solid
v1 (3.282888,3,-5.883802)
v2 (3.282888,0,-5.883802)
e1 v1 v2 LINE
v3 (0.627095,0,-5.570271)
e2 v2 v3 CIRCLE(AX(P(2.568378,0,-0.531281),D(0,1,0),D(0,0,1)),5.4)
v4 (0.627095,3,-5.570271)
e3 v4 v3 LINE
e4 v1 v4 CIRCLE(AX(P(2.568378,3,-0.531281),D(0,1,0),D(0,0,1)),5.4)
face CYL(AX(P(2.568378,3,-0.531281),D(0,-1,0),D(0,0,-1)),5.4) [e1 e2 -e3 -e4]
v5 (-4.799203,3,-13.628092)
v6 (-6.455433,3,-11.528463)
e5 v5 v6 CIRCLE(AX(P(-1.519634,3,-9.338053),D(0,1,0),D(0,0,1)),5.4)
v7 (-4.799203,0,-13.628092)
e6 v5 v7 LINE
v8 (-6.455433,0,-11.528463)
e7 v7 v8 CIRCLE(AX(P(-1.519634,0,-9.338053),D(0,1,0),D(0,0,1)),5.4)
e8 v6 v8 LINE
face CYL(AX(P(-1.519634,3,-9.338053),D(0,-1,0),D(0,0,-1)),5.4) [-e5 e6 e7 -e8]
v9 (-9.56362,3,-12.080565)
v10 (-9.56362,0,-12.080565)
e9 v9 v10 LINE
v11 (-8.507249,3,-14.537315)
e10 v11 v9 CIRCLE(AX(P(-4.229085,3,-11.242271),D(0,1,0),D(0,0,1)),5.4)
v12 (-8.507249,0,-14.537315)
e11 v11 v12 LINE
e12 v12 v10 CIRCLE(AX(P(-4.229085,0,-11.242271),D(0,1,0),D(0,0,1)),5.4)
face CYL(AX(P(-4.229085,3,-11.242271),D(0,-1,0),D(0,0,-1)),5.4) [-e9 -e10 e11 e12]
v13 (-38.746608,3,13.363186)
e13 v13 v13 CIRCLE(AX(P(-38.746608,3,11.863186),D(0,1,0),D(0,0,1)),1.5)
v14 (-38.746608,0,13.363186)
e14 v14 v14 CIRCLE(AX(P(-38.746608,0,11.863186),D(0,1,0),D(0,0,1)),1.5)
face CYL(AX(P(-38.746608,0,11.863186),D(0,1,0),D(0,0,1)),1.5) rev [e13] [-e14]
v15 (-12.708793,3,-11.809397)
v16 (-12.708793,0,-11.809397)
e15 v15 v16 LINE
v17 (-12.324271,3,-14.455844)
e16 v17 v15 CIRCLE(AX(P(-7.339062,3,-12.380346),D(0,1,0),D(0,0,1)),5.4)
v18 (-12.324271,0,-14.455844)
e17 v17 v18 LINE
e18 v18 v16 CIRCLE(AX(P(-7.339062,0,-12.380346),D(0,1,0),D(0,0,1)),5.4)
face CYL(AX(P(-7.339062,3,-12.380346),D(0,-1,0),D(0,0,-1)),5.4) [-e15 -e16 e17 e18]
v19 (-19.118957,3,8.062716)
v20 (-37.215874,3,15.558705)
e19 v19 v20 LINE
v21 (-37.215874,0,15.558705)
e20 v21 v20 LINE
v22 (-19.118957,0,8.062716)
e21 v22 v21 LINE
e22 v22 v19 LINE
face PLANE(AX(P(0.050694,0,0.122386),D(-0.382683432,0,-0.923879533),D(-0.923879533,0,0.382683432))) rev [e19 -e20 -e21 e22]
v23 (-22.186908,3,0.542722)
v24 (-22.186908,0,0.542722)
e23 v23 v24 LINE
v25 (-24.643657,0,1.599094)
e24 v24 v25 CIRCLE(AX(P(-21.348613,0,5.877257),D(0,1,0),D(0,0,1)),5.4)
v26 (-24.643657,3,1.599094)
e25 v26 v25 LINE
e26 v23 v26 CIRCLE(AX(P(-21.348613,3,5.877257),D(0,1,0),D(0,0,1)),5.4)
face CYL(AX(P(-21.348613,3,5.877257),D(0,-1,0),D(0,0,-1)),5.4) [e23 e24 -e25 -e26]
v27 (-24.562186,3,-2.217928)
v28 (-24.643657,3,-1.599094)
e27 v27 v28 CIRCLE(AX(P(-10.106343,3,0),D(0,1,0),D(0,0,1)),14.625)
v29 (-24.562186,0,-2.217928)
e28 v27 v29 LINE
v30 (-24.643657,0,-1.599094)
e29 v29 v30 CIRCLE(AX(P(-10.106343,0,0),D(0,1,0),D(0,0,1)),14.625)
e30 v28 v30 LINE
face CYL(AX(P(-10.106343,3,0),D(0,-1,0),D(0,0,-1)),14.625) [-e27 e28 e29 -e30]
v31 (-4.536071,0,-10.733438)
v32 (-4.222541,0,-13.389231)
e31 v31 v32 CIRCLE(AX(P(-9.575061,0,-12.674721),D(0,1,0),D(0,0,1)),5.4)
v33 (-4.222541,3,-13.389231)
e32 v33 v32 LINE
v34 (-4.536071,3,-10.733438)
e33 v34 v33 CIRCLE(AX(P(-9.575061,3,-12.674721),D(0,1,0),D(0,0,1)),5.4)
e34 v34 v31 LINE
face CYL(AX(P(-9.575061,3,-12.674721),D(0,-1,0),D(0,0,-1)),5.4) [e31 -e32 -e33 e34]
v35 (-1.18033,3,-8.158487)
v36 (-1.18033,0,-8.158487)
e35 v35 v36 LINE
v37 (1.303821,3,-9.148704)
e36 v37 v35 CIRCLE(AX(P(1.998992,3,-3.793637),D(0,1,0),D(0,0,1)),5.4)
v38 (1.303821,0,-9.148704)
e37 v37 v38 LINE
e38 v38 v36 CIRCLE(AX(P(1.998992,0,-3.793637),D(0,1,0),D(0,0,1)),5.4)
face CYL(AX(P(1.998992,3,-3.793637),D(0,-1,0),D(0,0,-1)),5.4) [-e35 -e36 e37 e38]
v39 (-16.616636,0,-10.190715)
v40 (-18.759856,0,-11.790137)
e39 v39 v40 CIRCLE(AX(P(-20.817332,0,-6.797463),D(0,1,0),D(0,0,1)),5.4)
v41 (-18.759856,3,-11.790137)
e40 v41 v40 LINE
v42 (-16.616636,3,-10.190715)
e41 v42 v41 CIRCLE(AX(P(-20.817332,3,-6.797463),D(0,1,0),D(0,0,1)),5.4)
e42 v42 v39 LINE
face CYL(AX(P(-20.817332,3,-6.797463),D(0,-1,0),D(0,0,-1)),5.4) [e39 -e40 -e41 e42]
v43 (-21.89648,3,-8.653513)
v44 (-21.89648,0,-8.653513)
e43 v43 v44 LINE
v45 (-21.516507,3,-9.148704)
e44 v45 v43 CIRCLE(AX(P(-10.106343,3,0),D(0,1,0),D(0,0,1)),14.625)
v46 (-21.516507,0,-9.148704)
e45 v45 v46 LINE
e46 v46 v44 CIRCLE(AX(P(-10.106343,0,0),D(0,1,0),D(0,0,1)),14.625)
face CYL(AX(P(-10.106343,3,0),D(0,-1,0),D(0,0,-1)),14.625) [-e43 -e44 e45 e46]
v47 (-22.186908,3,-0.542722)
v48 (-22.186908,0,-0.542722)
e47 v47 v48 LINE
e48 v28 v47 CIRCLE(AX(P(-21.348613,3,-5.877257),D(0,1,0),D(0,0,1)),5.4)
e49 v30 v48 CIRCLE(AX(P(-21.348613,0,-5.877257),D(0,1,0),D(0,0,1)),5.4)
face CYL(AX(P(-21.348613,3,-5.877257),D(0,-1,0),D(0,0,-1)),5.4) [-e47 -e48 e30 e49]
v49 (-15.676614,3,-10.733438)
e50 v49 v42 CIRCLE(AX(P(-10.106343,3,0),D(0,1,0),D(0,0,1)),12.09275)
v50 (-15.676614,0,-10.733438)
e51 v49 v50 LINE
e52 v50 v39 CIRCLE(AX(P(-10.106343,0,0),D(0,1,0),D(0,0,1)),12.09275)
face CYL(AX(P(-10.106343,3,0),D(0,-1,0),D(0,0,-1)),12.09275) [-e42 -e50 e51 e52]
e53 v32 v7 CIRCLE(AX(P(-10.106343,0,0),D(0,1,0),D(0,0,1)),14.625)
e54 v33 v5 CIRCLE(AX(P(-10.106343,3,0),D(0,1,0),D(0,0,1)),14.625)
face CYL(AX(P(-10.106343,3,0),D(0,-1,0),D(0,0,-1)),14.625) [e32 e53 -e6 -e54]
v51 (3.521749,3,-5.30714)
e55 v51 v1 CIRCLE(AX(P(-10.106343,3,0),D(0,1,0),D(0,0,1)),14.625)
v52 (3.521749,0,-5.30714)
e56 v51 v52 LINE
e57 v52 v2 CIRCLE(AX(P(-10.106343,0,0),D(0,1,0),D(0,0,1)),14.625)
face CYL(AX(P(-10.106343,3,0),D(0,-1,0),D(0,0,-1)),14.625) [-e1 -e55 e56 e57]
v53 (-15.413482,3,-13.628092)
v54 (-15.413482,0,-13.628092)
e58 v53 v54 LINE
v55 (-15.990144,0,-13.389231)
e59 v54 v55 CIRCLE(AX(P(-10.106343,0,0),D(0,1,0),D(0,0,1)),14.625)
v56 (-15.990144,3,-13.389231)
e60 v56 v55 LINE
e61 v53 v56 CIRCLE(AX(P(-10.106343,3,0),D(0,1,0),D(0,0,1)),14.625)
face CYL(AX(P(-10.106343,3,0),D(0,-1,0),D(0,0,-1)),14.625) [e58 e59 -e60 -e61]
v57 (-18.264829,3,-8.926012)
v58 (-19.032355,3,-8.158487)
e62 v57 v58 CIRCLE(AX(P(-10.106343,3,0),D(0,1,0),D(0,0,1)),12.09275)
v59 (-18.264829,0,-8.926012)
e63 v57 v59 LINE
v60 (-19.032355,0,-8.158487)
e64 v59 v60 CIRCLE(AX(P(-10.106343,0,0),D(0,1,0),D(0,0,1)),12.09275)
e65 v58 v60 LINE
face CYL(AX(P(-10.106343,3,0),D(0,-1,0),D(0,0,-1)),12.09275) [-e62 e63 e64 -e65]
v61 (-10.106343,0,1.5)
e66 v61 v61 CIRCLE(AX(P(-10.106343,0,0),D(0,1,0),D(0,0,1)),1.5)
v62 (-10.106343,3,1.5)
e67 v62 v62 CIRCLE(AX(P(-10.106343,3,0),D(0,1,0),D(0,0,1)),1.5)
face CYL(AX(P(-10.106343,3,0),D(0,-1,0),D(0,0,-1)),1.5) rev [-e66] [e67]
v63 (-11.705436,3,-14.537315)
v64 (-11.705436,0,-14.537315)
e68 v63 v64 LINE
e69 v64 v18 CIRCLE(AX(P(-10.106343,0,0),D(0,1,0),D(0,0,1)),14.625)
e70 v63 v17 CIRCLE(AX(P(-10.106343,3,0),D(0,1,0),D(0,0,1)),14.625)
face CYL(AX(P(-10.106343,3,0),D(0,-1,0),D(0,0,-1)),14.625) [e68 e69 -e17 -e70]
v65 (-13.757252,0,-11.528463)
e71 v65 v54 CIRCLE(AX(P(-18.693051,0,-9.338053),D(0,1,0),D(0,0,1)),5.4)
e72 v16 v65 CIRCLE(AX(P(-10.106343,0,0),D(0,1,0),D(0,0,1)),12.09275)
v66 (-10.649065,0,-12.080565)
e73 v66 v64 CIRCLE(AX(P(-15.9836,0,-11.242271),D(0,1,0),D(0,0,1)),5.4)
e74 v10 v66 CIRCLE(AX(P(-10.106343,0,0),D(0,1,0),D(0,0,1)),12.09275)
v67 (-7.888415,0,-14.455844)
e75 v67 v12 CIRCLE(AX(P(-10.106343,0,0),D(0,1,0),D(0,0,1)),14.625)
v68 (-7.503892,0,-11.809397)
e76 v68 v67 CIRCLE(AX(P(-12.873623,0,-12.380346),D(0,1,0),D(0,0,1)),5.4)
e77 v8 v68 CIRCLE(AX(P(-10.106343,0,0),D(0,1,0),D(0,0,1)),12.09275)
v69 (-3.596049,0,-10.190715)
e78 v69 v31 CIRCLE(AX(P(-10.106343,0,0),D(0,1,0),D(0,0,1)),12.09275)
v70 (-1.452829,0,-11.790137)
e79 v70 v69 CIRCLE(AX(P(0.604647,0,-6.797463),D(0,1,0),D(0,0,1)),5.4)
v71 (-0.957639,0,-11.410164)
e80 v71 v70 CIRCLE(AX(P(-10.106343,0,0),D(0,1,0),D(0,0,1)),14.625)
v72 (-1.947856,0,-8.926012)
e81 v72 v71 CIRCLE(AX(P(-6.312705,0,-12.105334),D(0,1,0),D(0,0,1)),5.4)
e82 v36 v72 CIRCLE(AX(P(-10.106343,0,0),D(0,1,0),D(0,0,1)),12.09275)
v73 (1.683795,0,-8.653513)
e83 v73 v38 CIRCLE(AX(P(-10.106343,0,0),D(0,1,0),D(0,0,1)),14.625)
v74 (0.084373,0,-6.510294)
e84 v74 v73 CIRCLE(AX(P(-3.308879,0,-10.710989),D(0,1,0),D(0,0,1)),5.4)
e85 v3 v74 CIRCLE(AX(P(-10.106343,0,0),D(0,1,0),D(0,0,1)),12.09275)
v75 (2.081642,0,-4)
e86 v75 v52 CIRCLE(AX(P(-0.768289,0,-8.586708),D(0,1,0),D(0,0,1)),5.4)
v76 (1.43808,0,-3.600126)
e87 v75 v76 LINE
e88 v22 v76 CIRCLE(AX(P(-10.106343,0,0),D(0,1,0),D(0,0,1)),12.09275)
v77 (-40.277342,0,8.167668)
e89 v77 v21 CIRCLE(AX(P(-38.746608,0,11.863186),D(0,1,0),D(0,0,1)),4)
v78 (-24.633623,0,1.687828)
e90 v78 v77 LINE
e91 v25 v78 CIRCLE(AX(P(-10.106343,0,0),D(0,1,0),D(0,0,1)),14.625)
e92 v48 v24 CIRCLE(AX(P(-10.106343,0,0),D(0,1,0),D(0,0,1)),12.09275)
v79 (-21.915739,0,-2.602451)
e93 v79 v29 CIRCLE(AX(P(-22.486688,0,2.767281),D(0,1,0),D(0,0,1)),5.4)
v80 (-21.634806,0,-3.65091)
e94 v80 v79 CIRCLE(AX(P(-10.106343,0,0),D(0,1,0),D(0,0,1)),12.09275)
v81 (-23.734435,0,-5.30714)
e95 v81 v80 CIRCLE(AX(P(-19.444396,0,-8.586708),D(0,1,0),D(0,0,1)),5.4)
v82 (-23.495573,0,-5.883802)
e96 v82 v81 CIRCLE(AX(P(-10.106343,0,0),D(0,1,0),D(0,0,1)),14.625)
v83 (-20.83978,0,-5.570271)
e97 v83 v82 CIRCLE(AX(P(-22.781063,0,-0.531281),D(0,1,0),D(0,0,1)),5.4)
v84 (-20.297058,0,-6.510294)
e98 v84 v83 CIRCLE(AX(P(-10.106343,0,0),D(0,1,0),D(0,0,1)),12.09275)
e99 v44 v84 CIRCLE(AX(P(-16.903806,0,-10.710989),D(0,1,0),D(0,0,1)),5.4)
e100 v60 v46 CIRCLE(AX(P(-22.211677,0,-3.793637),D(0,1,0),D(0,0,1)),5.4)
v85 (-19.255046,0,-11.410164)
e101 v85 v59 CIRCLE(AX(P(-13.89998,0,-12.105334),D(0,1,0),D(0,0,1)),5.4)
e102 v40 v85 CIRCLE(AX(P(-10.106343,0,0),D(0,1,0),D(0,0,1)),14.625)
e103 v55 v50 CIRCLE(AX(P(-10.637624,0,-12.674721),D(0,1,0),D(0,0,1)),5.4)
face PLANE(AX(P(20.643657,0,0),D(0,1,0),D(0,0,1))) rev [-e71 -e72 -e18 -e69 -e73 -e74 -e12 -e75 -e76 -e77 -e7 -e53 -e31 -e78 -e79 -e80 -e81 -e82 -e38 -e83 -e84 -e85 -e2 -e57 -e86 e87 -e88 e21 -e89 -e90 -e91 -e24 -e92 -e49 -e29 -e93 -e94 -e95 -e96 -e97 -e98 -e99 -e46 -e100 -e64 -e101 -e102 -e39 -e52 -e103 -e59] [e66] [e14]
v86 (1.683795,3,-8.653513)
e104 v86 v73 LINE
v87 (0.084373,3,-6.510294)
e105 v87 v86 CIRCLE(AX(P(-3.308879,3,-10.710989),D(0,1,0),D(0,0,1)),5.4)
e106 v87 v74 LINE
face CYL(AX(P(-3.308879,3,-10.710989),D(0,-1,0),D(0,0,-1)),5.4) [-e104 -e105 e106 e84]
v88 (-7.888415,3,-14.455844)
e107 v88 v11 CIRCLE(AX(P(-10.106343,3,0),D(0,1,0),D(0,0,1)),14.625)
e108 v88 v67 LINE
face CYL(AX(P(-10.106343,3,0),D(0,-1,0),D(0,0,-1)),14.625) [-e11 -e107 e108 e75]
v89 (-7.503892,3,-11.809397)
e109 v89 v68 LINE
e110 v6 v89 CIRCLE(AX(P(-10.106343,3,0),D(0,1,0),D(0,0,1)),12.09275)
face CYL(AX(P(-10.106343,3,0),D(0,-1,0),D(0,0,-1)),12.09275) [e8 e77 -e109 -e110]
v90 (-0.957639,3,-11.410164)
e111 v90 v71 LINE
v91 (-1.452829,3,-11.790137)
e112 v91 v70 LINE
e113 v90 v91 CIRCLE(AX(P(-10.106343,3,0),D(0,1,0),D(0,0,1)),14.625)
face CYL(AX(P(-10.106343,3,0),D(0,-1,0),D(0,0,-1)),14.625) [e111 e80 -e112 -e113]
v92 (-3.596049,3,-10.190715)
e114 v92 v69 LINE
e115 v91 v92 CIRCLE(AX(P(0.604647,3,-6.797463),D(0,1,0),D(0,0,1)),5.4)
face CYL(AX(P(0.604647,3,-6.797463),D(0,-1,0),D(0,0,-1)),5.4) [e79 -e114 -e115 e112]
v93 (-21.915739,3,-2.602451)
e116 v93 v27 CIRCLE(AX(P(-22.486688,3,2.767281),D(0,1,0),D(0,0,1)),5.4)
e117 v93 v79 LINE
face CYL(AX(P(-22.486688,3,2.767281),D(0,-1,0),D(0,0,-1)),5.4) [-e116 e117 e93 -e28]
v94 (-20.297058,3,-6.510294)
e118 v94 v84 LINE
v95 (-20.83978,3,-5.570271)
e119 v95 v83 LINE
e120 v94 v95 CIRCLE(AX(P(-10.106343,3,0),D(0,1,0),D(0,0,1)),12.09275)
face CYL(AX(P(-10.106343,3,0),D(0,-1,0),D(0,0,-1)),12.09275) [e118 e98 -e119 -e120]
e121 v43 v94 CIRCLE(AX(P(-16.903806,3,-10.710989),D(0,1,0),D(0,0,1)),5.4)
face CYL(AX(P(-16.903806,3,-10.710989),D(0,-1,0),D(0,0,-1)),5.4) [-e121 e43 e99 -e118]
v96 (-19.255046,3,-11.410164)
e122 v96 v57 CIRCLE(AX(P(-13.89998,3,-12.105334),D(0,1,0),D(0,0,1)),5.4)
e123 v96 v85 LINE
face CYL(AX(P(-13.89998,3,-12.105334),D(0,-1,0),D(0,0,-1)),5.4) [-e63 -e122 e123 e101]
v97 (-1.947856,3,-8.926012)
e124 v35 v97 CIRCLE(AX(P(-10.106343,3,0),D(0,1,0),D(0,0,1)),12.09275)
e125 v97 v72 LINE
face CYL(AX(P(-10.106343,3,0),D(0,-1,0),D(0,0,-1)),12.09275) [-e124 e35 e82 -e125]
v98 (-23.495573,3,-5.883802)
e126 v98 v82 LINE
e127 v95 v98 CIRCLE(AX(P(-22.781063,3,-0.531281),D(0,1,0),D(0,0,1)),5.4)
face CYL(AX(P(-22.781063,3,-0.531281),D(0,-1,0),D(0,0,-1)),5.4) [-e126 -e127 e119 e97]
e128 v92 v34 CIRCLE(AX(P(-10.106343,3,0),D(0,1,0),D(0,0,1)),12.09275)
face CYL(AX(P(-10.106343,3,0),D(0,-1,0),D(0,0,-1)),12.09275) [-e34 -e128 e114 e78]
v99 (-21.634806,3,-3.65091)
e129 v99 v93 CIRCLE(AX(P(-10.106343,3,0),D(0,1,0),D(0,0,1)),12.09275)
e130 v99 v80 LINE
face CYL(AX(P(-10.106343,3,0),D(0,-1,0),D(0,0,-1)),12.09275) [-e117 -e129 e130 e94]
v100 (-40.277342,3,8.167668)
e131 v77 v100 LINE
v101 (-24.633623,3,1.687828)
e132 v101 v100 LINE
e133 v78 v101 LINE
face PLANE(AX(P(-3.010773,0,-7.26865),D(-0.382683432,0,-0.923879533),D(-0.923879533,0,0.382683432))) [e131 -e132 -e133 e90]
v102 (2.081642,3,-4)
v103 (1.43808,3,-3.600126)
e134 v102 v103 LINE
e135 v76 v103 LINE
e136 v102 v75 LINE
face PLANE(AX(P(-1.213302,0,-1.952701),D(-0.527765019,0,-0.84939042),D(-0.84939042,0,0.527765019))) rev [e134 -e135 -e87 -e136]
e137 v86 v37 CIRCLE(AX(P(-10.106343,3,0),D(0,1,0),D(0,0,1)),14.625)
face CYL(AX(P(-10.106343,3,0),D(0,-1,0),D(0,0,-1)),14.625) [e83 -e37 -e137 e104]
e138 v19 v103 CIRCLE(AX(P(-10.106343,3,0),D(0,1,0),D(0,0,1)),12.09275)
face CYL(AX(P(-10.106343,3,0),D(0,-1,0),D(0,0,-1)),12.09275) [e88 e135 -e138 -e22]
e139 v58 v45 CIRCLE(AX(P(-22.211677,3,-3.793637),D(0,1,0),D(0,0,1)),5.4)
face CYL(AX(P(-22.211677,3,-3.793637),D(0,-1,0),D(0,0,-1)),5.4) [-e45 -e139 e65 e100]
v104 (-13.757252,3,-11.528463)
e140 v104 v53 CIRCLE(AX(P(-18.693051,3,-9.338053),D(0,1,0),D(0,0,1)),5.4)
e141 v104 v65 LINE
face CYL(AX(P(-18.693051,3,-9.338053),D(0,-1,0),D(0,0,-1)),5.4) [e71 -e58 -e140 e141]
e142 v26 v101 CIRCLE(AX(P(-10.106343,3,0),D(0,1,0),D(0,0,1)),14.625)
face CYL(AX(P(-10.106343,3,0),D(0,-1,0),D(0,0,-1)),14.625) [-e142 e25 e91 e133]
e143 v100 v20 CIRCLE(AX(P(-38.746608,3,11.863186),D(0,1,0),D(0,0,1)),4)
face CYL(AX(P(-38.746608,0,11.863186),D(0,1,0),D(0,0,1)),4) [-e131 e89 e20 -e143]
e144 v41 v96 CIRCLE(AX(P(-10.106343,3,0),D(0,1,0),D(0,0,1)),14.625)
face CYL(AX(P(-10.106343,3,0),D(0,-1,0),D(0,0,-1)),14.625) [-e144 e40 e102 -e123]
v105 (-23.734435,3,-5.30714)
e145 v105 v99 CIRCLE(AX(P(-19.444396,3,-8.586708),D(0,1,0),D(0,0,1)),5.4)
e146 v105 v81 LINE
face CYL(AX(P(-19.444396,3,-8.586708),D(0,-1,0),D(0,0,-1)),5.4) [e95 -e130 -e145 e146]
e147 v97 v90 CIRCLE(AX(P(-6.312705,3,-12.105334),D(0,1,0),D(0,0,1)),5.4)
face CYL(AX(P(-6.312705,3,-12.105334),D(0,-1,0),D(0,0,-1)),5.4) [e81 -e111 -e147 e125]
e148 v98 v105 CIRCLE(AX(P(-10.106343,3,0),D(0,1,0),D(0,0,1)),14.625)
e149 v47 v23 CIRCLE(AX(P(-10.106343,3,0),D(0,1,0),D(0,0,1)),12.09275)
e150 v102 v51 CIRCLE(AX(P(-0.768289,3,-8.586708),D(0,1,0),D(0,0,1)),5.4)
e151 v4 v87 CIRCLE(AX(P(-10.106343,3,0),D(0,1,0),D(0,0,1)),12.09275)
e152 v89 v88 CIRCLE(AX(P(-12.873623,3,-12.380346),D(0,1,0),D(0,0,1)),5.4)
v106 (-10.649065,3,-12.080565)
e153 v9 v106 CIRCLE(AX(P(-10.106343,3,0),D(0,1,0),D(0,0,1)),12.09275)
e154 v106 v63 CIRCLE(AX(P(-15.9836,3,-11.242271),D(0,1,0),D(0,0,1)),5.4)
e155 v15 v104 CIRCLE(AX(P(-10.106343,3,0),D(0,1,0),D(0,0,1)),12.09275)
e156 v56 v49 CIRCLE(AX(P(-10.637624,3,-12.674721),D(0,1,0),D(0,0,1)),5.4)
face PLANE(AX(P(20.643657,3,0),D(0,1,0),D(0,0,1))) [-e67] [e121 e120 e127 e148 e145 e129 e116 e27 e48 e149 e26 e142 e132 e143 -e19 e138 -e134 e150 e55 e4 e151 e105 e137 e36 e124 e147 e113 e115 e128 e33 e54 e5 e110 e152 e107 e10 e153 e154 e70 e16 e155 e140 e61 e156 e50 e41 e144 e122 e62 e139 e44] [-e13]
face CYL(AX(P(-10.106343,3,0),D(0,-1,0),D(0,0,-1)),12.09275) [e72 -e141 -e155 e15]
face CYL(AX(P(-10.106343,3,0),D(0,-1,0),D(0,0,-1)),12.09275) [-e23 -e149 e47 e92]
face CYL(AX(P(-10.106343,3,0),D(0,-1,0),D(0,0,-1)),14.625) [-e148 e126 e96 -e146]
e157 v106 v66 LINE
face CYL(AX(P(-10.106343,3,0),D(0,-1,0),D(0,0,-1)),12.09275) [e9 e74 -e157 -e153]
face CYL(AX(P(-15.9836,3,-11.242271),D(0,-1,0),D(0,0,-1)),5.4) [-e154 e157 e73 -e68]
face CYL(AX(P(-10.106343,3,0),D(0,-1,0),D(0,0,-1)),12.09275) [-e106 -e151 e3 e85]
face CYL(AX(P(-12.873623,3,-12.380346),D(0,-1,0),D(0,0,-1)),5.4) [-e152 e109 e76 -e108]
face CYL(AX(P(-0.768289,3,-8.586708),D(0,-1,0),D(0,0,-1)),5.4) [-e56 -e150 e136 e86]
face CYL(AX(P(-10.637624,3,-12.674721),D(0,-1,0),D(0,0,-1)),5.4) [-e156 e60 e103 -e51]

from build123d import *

# Parameters (mm, degrees)
SKETCH1_R              = 1.5
BOSS_EXTRUDE1_DEPTH    = 3
SKETCH3_R              = 1.5
BOSS_EXTRUDE2_DEPTH    = 3
CUT_EXTRUDE1_OUTLINE_R = 1.5
CUT_EXTRUDE1_DEPTH     = 3


# Read off the part's stored shape, not the designer's step: Cut-Extrude1
with BuildPart() as part:
    # Sketch1 → Boss-Extrude1 (new body)
    with BuildSketch(Plane(origin=(0, 0, 0), x_dir=(1, 0, 0), z_dir=(0, 1, 0))):
        with BuildLine():
            Line((20.643657446, 4), (2.081641936, 4))
            ThreePointArc((2.081641936, 4), (2.861028333, 4.588201733), (3.521749436, 5.30713988))
            ThreePointArc((3.521749436, 5.30713988), (3.405395609, 5.596745198), (3.282888305, 5.883801663))
            ThreePointArc((3.282888305, 5.883801663), (1.93527598, 5.894040025), (0.627094961, 5.57027124))
            ThreePointArc((0.627094961, 5.57027124), (0.366286148, 6.046375), (0.084372603, 6.510293938))
            ThreePointArc((0.084372603, 6.510293938), (1.018855105, 7.48132754), (1.683794586, 8.65351323))
            ThreePointArc((1.683794586, 8.65351323), (1.496450048, 8.903135899), (1.303821399, 9.148703928))
            ThreePointArc((1.303821399, 9.148703928), (-0.000522033, 8.809805691), (-1.180330337, 8.158486898))
            ThreePointArc((-1.180330337, 8.158486898), (-1.555477026, 8.550865528), (-1.947855656, 8.926012217))
            ThreePointArc((-1.947855656, 8.926012217), (-1.296536862, 10.105820521), (-0.957638625, 11.410163953))
            ThreePointArc((-0.957638625, 11.410163953), (-1.203206655, 11.602792602), (-1.452829324, 11.79013714))
            ThreePointArc((-1.452829324, 11.79013714), (-2.625015014, 11.125197659), (-3.596048616, 10.190715157))
            ThreePointArc((-3.596048616, 10.190715157), (-4.059967554, 10.472628702), (-4.536071314, 10.733437515))
            ThreePointArc((-4.536071314, 10.733437515), (-4.212302529, 12.041618533), (-4.222540891, 13.389230859))
            ThreePointArc((-4.222540891, 13.389230859), (-4.509597355, 13.511738163), (-4.799202674, 13.62809199))
            ThreePointArc((-4.799202674, 13.62809199), (-5.759348103, 12.682425791), (-6.455432668, 11.528463019))
            ThreePointArc((-6.455432668, 11.528463019), (-6.976508546, 11.680699536), (-7.503891752, 11.809396783))
            ThreePointArc((-7.503891752, 11.809396783), (-7.529737283, 13.156800143), (-7.888414517, 14.455843809))
            ThreePointArc((-7.888414517, 14.455843809), (-8.197396993, 14.499881098), (-8.507248835, 14.537314892))
            ThreePointArc((-8.507248835, 14.537314892), (-9.18992168, 13.375367565), (-9.563620196, 12.080565177))
            ThreePointArc((-9.563620196, 12.080565177), (-10.106342554, 12.09275), (-10.649064912, 12.080565177))
            ThreePointArc((-10.649064912, 12.080565177), (-11.022763428, 13.375367565), (-11.705436272, 14.537314892))
            ThreePointArc((-11.705436272, 14.537314892), (-12.015288115, 14.499881098), (-12.324270591, 14.455843809))
            ThreePointArc((-12.324270591, 14.455843809), (-12.682947825, 13.156800143), (-12.708793355, 11.809396783))
            ThreePointArc((-12.708793355, 11.809396783), (-13.236176561, 11.680699536), (-13.757252439, 11.528463019))
            ThreePointArc((-13.757252439, 11.528463019), (-14.453337005, 12.682425791), (-15.413482434, 13.62809199))
            ThreePointArc((-15.413482434, 13.62809199), (-15.703087752, 13.511738163), (-15.990144217, 13.389230859))
            ThreePointArc((-15.990144217, 13.389230859), (-16.000382579, 12.041618533), (-15.676613793, 10.733437515))
            ThreePointArc((-15.676613793, 10.733437515), (-16.152717554, 10.472628702), (-16.616636492, 10.190715157))
            ThreePointArc((-16.616636492, 10.190715157), (-17.587670094, 11.125197659), (-18.759855783, 11.79013714))
            ThreePointArc((-18.759855783, 11.79013714), (-19.009478453, 11.602792602), (-19.255046482, 11.410163953))
            ThreePointArc((-19.255046482, 11.410163953), (-18.916148245, 10.105820521), (-18.264829452, 8.926012217))
            ThreePointArc((-18.264829452, 8.926012217), (-18.657208082, 8.550865528), (-19.032354771, 8.158486898))
            ThreePointArc((-19.032354771, 8.158486898), (-20.212163074, 8.809805691), (-21.516506507, 9.148703928))
            ThreePointArc((-21.516506507, 9.148703928), (-21.709135156, 8.903135899), (-21.896479694, 8.65351323))
            ThreePointArc((-21.896479694, 8.65351323), (-21.231540213, 7.48132754), (-20.297057711, 6.510293938))
            ThreePointArc((-20.297057711, 6.510293938), (-20.578971255, 6.046375), (-20.839780068, 5.57027124))
            ThreePointArc((-20.839780068, 5.57027124), (-22.147961087, 5.894040025), (-23.495573413, 5.883801663))
            ThreePointArc((-23.495573413, 5.883801663), (-23.618080717, 5.596745198), (-23.734434544, 5.30713988))
            ThreePointArc((-23.734434544, 5.30713988), (-22.788768345, 4.346994451), (-21.634805572, 3.650909885))
            ThreePointArc((-21.634805572, 3.650909885), (-21.78704209, 3.129834008), (-21.915739337, 2.602450802))
            ThreePointArc((-21.915739337, 2.602450802), (-23.263142697, 2.576605271), (-24.562186363, 2.217928037))
            ThreePointArc((-24.562186363, 2.217928037), (-24.606223651, 1.908945561), (-24.643657446, 1.599093719))
            ThreePointArc((-24.643657446, 1.599093719), (-23.481710119, 0.916420874), (-22.186907731, 0.542722358))
            ThreePointArc((-22.186907731, 0.542722358), (-22.199092554, 0), (-22.186907731, -0.542722358))
            ThreePointArc((-22.186907731, -0.542722358), (-23.481710119, -0.916420874), (-24.643657446, -1.599093719))
            ThreePointArc((-24.643657446, -1.599093719), (-24.606223651, -1.908945561), (-24.562186363, -2.217928037))
            ThreePointArc((-24.562186363, -2.217928037), (-23.263142697, -2.576605271), (-21.915739337, -2.602450802))
            ThreePointArc((-21.915739337, -2.602450802), (-21.78704209, -3.129834008), (-21.634805572, -3.650909885))
            ThreePointArc((-21.634805572, -3.650909885), (-22.788768345, -4.346994451), (-23.734434544, -5.30713988))
            ThreePointArc((-23.734434544, -5.30713988), (-23.618080717, -5.596745198), (-23.495573413, -5.883801663))
            ThreePointArc((-23.495573413, -5.883801663), (-22.147961087, -5.894040025), (-20.839780068, -5.57027124))
            ThreePointArc((-20.839780068, -5.57027124), (-20.578971255, -6.046375), (-20.297057711, -6.510293938))
            ThreePointArc((-20.297057711, -6.510293938), (-21.231540213, -7.48132754), (-21.896479694, -8.65351323))
            ThreePointArc((-21.896479694, -8.65351323), (-21.709135156, -8.903135899), (-21.516506507, -9.148703928))
            ThreePointArc((-21.516506507, -9.148703928), (-20.212163074, -8.809805691), (-19.032354771, -8.158486898))
            ThreePointArc((-19.032354771, -8.158486898), (-18.657208082, -8.550865528), (-18.264829452, -8.926012217))
            ThreePointArc((-18.264829452, -8.926012217), (-18.916148245, -10.105820521), (-19.255046482, -11.410163953))
            ThreePointArc((-19.255046482, -11.410163953), (-19.009478453, -11.602792602), (-18.759855783, -11.79013714))
            ThreePointArc((-18.759855783, -11.79013714), (-17.587670094, -11.125197659), (-16.616636492, -10.190715157))
            ThreePointArc((-16.616636492, -10.190715157), (-16.152717554, -10.472628702), (-15.676613793, -10.733437515))
            ThreePointArc((-15.676613793, -10.733437515), (-16.000382579, -12.041618533), (-15.990144217, -13.389230859))
            ThreePointArc((-15.990144217, -13.389230859), (-15.703087752, -13.511738163), (-15.413482434, -13.62809199))
            ThreePointArc((-15.413482434, -13.62809199), (-14.453337005, -12.682425791), (-13.757252439, -11.528463019))
            ThreePointArc((-13.757252439, -11.528463019), (-13.236176561, -11.680699536), (-12.708793355, -11.809396783))
            ThreePointArc((-12.708793355, -11.809396783), (-12.682947825, -13.156800143), (-12.324270591, -14.455843809))
            ThreePointArc((-12.324270591, -14.455843809), (-12.015288115, -14.499881098), (-11.705436272, -14.537314892))
            ThreePointArc((-11.705436272, -14.537314892), (-11.022763428, -13.375367565), (-10.649064912, -12.080565177))
            ThreePointArc((-10.649064912, -12.080565177), (-10.106342554, -12.09275), (-9.563620196, -12.080565177))
            ThreePointArc((-9.563620196, -12.080565177), (-9.18992168, -13.375367565), (-8.507248835, -14.537314892))
            ThreePointArc((-8.507248835, -14.537314892), (-8.197396993, -14.499881098), (-7.888414517, -14.455843809))
            ThreePointArc((-7.888414517, -14.455843809), (-7.529737283, -13.156800143), (-7.503891752, -11.809396783))
            ThreePointArc((-7.503891752, -11.809396783), (-6.976508546, -11.680699536), (-6.455432668, -11.528463019))
            ThreePointArc((-6.455432668, -11.528463019), (-5.759348103, -12.682425791), (-4.799202674, -13.62809199))
            ThreePointArc((-4.799202674, -13.62809199), (-4.509597355, -13.511738163), (-4.222540891, -13.389230859))
            ThreePointArc((-4.222540891, -13.389230859), (-4.212302529, -12.041618533), (-4.536071314, -10.733437515))
            ThreePointArc((-4.536071314, -10.733437515), (-4.059967554, -10.472628702), (-3.596048616, -10.190715157))
            ThreePointArc((-3.596048616, -10.190715157), (-2.625015014, -11.125197659), (-1.452829324, -11.79013714))
            ThreePointArc((-1.452829324, -11.79013714), (-1.203206655, -11.602792602), (-0.957638625, -11.410163953))
            ThreePointArc((-0.957638625, -11.410163953), (-1.296536862, -10.105820521), (-1.947855656, -8.926012217))
            ThreePointArc((-1.947855656, -8.926012217), (-1.555477026, -8.550865528), (-1.180330337, -8.158486898))
            ThreePointArc((-1.180330337, -8.158486898), (-0.000522033, -8.809805691), (1.303821399, -9.148703928))
            ThreePointArc((1.303821399, -9.148703928), (1.496450048, -8.903135899), (1.683794586, -8.65351323))
            ThreePointArc((1.683794586, -8.65351323), (1.018855105, -7.48132754), (0.084372603, -6.510293938))
            ThreePointArc((0.084372603, -6.510293938), (0.366286148, -6.046375), (0.627094961, -5.57027124))
            ThreePointArc((0.627094961, -5.57027124), (1.93527598, -5.894040025), (3.282888305, -5.883801663))
            ThreePointArc((3.282888305, -5.883801663), (3.405395609, -5.596745198), (3.521749436, -5.30713988))
            ThreePointArc((3.521749436, -5.30713988), (2.861028333, -4.588201733), (2.081641936, -4))
            Line((2.081641936, -4), (20.643657446, -4))
            ThreePointArc((20.643657446, -4), (24.643657446, 0), (20.643657446, 4))
        make_face()
        with Locations(Location((-10.106342554, 0, 0), (0, 0, 270))):
            Circle(SKETCH1_R, mode=Mode.SUBTRACT)
        with Locations(Location((20.643657446, 0, 0), (0, 0, 270))):
            Circle(SKETCH1_R, mode=Mode.SUBTRACT)
    extrude(amount=BOSS_EXTRUDE1_DEPTH)

    # Sketch3 → Boss-Extrude2 (add)
    with BuildSketch(Plane(origin=(0, 3, 0), x_dir=(1, 0, 0), z_dir=(0, 1, 0))):
        with BuildLine():
            Line((-14.106342554, 0), (-20.558846273, 0))
            Line((-20.558846273, 0), (-40.277341791, -8.167668273))
            ThreePointArc((-40.277341791, -8.167668273), (-42.442126192, -13.393920133), (-37.215874332, -15.558704533))
            Line((-37.215874332, -15.558704533), (-8.575608824, -3.69551813))
            ThreePointArc((-8.575608824, -3.69551813), (-12.328623486, -3.325878449), (-14.106342554, 0))
        make_face()
        with Locations(Location((-38.746608062, -11.863186403, 0), (0, 0, 270))):
            Circle(SKETCH3_R, mode=Mode.SUBTRACT)
    extrude(amount=-BOSS_EXTRUDE2_DEPTH)

    # Cut-Extrude1 outline → Cut-Extrude1 (cut)
    # profile 1 of 9: a face of its own
    with BuildSketch(Plane(origin=(0, 0, 0), x_dir=(1, 0, 0), z_dir=(0, 1, 0))):
        with BuildLine():
            Line((2.081641936, 4), (1.43808022, 3.600125745))
            ThreePointArc((1.43808022, 3.600125745), (1.939395695, -1.065266441), (0.627094961, -5.57027124))
            ThreePointArc((0.627094961, -5.57027124), (1.93527598, -5.894040025), (3.282888305, -5.883801663))
            ThreePointArc((3.282888305, -5.883801663), (3.405395609, -5.596745198), (3.521749436, -5.30713988))
            ThreePointArc((3.521749436, -5.30713988), (2.861028333, -4.588201733), (2.081641936, -4))
            Line((2.081641936, -4), (20.643657446, -4))
            ThreePointArc((20.643657446, -4), (24.643657446, 0), (20.643657446, 4))
            Line((20.643657446, 4), (2.081641936, 4))
        make_face()
        with Locations((20.643657446, 0)):
            Circle(CUT_EXTRUDE1_OUTLINE_R, mode=Mode.SUBTRACT)
    # profile 2 of 9: a face of its own
    with BuildSketch(Plane(origin=(0, 0, 0), x_dir=(1, 0, 0), z_dir=(0, 1, 0))):
        with BuildLine():
            ThreePointArc((-21.516506507, -9.148703928), (-20.212163075, -8.809805691), (-19.032354771, -8.158486898))
            ThreePointArc((-19.032354771, -8.158486898), (-19.075783612, -8.110716964), (-19.118956803, -8.062715855))
            Line((-19.118956803, -8.062715855), (-21.572155055, -9.078863843))
            ThreePointArc((-21.572155055, -9.078863843), (-21.544384086, -9.113826359), (-21.516506507, -9.148703928))
        make_face()
    # profile 3 of 9: a face of its own
    with BuildSketch(Plane(origin=(0, 0, 0), x_dir=(1, 0, 0), z_dir=(0, 1, 0))):
        with BuildLine():
            ThreePointArc((-18.759855783, -11.79013714), (-17.587670094, -11.125197659), (-16.616636492, -10.190715157))
            ThreePointArc((-16.616636492, -10.190715157), (-17.467942325, -9.593823606), (-18.264829452, -8.926012217))
            ThreePointArc((-18.264829452, -8.926012217), (-18.916148245, -10.105820521), (-19.255046482, -11.410163953))
            ThreePointArc((-19.255046482, -11.410163953), (-19.009478453, -11.602792602), (-18.759855783, -11.79013714))
        make_face()
    # profile 4 of 9: a face of its own
    with BuildSketch(Plane(origin=(0, 0, 0), x_dir=(1, 0, 0), z_dir=(0, 1, 0))):
        with BuildLine():
            ThreePointArc((-15.413482434, -13.62809199), (-14.453337005, -12.682425791), (-13.757252439, -11.528463019))
            ThreePointArc((-13.757252439, -11.528463019), (-14.73403763, -11.172244217), (-15.676613793, -10.733437515))
            ThreePointArc((-15.676613793, -10.733437515), (-16.000382579, -12.041618533), (-15.990144217, -13.389230859))
            ThreePointArc((-15.990144217, -13.389230859), (-15.703087752, -13.511738163), (-15.413482434, -13.62809199))
        make_face()
    # profile 5 of 9: a face of its own
    with BuildSketch(Plane(origin=(0, 0, 0), x_dir=(1, 0, 0), z_dir=(0, 1, 0))):
        with BuildLine():
            ThreePointArc((-11.705436272, -14.537314892), (-11.022763428, -13.375367565), (-10.649064912, -12.080565177))
            ThreePointArc((-10.649064912, -12.080565177), (-11.684763165, -11.989294847), (-12.708793355, -11.809396783))
            ThreePointArc((-12.708793355, -11.809396783), (-12.682947825, -13.156800143), (-12.324270591, -14.455843809))
            ThreePointArc((-12.324270591, -14.455843809), (-12.015288115, -14.499881098), (-11.705436272, -14.537314892))
        make_face()
    # profile 6 of 9: a face of its own
    with BuildSketch(Plane(origin=(0, 0, 0), x_dir=(1, 0, 0), z_dir=(0, 1, 0))):
        with BuildLine():
            ThreePointArc((-7.888414517, -14.455843809), (-7.529737283, -13.156800143), (-7.503891752, -11.809396783))
            ThreePointArc((-7.503891752, -11.809396783), (-8.527921943, -11.989294847), (-9.563620196, -12.080565177))
            ThreePointArc((-9.563620196, -12.080565177), (-9.18992168, -13.375367565), (-8.507248835, -14.537314892))
            ThreePointArc((-8.507248835, -14.537314892), (-8.197396993, -14.499881098), (-7.888414517, -14.455843809))
        make_face()
    # profile 7 of 9: a face of its own
    with BuildSketch(Plane(origin=(0, 0, 0), x_dir=(1, 0, 0), z_dir=(0, 1, 0))):
        with BuildLine():
            ThreePointArc((-4.222540891, -13.389230859), (-4.212302529, -12.041618534), (-4.536071314, -10.733437515))
            ThreePointArc((-4.536071314, -10.733437515), (-5.478647477, -11.172244217), (-6.455432668, -11.528463019))
            ThreePointArc((-6.455432668, -11.528463019), (-5.759348103, -12.682425792), (-4.799202674, -13.62809199))
            ThreePointArc((-4.799202674, -13.62809199), (-4.509597356, -13.511738163), (-4.222540891, -13.389230859))
        make_face()
    # profile 8 of 9: a face of its own
    with BuildSketch(Plane(origin=(0, 0, 0), x_dir=(1, 0, 0), z_dir=(0, 1, 0))):
        with BuildLine():
            ThreePointArc((-0.957638625, -11.410163953), (-1.296536862, -10.105820521), (-1.947855656, -8.926012217))
            ThreePointArc((-1.947855656, -8.926012217), (-2.744742783, -9.593823606), (-3.596048616, -10.190715157))
            ThreePointArc((-3.596048616, -10.190715157), (-2.625015014, -11.125197659), (-1.452829324, -11.79013714))
            ThreePointArc((-1.452829324, -11.79013714), (-1.203206654, -11.602792602), (-0.957638625, -11.410163953))
        make_face()
    # profile 9 of 9: a face of its own
    with BuildSketch(Plane(origin=(0, 0, 0), x_dir=(1, 0, 0), z_dir=(0, 1, 0))):
        with BuildLine():
            ThreePointArc((1.683794586, -8.65351323), (1.018855105, -7.48132754), (0.084372603, -6.510293938))
            ThreePointArc((0.084372603, -6.510293938), (-0.512518948, -7.361599771), (-1.180330337, -8.158486898))
            ThreePointArc((-1.180330337, -8.158486898), (-0.000522033, -8.809805691), (1.303821399, -9.148703928))
            ThreePointArc((1.303821399, -9.148703928), (1.496450048, -8.903135899), (1.683794586, -8.65351323))
        make_face()
    extrude(amount=CUT_EXTRUDE1_DEPTH, mode=Mode.SUBTRACT)


solid = part.part
